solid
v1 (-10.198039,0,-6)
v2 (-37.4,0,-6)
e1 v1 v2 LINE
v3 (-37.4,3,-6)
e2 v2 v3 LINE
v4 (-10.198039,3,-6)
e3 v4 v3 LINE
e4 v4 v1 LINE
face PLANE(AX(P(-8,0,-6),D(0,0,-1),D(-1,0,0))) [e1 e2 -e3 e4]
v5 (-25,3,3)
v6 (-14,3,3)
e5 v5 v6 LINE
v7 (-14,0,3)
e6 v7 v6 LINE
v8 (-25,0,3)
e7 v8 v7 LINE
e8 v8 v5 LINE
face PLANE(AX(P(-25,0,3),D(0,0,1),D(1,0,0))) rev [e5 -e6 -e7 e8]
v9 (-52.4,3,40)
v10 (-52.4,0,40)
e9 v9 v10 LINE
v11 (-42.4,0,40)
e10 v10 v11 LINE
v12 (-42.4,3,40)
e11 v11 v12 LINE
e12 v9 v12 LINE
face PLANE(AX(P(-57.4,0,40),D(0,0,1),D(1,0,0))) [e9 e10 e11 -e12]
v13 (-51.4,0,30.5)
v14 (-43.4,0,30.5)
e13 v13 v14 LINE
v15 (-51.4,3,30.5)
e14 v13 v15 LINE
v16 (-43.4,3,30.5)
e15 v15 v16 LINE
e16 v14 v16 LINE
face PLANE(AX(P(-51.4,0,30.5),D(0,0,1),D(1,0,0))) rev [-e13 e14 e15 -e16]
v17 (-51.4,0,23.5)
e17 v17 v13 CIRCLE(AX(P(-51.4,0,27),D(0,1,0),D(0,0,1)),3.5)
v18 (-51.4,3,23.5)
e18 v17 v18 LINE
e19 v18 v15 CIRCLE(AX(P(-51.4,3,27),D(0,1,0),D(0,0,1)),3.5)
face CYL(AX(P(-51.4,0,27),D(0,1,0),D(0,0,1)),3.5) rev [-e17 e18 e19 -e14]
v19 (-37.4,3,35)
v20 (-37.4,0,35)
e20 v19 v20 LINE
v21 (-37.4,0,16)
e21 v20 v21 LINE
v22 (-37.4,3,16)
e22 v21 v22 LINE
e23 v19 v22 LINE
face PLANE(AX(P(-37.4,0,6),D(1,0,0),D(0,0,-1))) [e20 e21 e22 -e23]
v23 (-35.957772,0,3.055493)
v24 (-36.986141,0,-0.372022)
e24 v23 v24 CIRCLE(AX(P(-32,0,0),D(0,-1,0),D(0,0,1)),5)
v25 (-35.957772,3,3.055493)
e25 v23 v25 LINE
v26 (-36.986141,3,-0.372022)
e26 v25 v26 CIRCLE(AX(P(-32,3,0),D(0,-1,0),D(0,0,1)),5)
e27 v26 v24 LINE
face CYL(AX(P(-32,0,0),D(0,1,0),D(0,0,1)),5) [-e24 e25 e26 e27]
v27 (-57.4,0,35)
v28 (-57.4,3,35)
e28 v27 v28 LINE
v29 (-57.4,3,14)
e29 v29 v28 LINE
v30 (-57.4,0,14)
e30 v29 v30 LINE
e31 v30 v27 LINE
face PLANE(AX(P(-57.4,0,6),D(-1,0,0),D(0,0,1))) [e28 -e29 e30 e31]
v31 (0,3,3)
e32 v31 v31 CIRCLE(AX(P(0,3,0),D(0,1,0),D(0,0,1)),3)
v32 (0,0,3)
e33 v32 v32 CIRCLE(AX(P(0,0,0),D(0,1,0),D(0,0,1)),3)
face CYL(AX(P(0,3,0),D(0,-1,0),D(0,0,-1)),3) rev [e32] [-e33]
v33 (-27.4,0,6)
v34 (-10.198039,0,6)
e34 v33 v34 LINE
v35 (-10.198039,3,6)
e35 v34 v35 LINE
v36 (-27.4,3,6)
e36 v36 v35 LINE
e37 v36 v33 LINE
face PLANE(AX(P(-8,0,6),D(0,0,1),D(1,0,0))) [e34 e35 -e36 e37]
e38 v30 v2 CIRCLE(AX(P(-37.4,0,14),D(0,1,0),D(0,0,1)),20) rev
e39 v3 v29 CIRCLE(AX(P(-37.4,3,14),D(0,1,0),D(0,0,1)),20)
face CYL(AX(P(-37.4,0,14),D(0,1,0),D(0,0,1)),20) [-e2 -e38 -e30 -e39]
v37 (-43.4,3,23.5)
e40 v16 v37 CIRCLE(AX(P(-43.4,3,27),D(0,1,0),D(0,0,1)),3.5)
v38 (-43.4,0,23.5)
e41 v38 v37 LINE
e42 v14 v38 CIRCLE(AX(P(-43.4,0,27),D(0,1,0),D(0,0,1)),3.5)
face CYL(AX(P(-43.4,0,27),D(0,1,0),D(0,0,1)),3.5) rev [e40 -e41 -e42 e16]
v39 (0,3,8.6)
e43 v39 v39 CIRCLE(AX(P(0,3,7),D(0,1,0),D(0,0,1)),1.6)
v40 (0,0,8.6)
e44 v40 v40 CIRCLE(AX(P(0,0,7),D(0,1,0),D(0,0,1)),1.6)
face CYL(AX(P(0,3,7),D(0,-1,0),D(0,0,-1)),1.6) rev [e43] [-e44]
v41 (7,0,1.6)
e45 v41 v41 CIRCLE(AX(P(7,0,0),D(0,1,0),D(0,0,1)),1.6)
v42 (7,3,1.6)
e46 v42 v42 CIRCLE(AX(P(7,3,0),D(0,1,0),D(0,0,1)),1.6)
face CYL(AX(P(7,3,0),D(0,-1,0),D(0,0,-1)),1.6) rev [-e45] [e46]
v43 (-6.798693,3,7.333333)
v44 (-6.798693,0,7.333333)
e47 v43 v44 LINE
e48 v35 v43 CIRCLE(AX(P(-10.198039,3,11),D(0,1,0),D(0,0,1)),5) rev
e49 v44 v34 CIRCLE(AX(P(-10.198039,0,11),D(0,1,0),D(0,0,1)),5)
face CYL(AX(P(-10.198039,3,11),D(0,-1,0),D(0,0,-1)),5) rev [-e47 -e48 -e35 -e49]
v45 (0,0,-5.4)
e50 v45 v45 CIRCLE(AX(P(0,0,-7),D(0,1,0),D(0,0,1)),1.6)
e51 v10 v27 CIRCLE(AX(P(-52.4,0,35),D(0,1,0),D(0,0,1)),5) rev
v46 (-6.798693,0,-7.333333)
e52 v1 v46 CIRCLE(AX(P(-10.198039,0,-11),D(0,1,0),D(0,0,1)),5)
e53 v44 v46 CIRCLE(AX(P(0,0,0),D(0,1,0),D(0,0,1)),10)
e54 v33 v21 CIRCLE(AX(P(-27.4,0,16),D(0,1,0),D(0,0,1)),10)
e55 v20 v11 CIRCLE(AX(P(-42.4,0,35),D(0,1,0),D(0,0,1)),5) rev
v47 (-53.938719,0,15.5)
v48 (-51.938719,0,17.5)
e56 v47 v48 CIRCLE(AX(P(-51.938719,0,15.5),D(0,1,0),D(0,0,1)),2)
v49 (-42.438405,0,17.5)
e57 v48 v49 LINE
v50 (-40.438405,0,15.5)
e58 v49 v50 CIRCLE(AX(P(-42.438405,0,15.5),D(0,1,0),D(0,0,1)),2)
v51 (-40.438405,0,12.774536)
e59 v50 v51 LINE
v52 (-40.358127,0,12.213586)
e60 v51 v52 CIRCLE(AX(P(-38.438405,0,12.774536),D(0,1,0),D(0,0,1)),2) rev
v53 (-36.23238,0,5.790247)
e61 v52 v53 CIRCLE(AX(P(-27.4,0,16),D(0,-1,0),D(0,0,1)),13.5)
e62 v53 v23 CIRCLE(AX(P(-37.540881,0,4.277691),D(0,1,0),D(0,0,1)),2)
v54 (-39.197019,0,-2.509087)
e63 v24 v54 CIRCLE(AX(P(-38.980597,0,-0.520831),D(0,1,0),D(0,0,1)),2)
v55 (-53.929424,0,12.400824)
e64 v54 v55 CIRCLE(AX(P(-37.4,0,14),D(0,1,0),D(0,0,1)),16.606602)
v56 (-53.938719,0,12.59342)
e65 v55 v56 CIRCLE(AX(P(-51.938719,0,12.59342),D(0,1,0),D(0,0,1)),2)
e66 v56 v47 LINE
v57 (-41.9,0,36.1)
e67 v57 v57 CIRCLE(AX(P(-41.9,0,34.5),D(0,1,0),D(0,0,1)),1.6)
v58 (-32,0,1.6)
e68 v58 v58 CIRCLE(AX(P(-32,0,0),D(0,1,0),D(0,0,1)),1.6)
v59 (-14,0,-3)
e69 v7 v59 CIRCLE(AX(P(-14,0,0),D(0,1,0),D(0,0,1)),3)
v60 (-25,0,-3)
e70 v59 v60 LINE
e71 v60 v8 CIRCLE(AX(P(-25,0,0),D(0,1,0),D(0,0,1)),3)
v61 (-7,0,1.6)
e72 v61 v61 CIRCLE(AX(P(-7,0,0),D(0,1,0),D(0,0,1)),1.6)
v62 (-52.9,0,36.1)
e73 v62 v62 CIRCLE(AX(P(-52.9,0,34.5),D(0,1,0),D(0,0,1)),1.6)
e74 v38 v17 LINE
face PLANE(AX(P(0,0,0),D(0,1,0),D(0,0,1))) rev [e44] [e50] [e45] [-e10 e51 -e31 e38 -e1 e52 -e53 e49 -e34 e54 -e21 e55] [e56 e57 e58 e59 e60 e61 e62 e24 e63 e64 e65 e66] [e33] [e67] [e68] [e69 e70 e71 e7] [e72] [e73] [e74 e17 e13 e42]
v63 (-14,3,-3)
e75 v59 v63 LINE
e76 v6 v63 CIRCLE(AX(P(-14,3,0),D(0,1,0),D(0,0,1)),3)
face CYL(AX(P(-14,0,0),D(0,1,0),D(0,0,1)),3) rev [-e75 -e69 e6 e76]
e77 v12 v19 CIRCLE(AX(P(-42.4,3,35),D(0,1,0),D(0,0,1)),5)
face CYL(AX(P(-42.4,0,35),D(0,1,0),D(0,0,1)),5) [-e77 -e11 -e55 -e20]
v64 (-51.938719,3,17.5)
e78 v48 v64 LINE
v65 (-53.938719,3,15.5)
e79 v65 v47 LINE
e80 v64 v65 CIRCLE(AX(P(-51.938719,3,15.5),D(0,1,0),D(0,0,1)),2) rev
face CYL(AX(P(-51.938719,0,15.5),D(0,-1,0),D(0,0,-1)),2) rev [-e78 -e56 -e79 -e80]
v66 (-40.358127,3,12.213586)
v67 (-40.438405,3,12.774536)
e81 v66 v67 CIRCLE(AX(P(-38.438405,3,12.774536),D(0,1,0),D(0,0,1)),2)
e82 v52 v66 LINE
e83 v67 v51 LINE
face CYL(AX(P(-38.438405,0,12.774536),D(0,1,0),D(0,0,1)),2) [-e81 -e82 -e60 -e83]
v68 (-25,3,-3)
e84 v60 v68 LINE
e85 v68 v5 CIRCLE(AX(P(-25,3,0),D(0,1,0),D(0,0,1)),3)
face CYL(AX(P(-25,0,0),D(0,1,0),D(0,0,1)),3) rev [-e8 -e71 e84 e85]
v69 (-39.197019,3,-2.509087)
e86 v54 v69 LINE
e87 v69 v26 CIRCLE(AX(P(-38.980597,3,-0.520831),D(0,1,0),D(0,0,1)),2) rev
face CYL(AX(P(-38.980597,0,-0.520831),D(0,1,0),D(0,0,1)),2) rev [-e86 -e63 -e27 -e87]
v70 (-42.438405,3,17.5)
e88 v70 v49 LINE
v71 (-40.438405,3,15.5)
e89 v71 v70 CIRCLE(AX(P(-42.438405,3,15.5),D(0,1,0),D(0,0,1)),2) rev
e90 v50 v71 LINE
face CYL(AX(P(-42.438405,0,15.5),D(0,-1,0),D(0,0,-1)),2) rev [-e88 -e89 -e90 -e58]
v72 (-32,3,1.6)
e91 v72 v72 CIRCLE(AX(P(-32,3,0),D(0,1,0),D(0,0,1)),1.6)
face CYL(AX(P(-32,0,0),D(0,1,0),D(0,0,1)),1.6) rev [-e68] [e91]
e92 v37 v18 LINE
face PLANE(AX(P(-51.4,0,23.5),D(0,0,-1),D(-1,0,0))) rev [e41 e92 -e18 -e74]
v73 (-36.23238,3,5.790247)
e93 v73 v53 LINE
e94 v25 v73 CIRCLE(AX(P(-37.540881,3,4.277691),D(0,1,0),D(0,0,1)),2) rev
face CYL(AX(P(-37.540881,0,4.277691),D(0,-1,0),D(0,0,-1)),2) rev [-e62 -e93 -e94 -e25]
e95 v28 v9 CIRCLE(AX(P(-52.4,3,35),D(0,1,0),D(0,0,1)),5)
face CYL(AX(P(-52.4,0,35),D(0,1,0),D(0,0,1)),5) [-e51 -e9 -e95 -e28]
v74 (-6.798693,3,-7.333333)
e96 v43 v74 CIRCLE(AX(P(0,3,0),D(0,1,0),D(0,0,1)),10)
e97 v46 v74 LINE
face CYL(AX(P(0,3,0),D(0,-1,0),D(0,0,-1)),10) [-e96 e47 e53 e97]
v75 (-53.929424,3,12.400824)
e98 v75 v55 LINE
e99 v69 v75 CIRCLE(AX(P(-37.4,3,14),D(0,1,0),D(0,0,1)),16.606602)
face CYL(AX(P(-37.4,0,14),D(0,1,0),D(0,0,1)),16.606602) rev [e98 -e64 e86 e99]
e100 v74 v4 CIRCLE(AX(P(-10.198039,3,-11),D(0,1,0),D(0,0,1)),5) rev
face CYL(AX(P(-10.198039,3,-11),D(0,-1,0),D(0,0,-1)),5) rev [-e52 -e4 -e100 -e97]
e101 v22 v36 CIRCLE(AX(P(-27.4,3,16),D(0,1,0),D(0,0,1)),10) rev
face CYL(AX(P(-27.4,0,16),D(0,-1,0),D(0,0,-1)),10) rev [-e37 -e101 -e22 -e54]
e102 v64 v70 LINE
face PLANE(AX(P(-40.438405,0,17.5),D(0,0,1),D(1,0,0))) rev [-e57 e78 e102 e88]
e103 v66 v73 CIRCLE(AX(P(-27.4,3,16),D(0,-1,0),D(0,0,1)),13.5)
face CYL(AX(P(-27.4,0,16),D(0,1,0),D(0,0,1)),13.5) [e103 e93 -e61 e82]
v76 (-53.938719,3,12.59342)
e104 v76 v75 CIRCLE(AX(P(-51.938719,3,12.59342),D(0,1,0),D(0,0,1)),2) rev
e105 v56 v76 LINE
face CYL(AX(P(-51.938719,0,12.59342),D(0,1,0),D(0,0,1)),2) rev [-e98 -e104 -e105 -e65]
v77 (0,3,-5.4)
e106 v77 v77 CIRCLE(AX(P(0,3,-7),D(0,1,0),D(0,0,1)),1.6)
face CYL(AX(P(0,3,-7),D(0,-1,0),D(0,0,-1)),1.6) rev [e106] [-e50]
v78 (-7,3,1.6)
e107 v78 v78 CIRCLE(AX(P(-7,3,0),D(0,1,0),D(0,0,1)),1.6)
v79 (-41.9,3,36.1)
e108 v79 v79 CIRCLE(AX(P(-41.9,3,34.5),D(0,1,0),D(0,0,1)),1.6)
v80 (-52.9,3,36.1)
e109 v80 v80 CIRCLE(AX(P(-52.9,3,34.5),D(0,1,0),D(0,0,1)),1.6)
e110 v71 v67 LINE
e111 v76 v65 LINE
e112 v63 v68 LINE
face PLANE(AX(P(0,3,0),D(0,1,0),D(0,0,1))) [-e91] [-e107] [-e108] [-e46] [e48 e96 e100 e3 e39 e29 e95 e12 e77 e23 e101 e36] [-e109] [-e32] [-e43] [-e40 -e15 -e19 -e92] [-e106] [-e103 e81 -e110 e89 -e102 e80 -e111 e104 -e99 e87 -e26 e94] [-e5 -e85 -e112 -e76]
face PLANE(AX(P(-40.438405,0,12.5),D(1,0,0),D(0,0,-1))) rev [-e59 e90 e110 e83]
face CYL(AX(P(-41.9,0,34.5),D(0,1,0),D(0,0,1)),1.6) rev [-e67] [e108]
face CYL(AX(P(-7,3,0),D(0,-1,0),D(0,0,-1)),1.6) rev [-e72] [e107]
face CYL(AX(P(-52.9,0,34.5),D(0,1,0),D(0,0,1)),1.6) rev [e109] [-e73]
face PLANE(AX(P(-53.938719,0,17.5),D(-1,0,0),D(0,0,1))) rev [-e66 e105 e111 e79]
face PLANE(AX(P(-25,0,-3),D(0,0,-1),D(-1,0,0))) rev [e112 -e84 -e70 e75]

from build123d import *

# Parameters (mm, degrees)
SKETCH_1_R          = 10
SKETCH_1_R_2        = 3
SKETCH_1_R_3        = 1.6
SKETCH_1_R_4        = 1.600000000000001
SKETCH_1_R_5        = 1.6000000000000003
SKETCH_1_R_6        = 1.6000000000000019
EXTRUDE_1_DEPTH     = 3
EXTRUDE_2_DEPTH     = 3
SKETCH_3_R          = 1.5999999999999974
EXTRUDE_3_DEPTH     = 3
FILLET_1_R          = 10
FILLET_2_R          = 20
CUT_EXTRUDE_START   = -3
SKETCH_4_R          = 1.6000000000000019
SKETCH_4_R_2        = 1.599999999999998
CUT_EXTRUDE_1_DEPTH = 3
FILLET_3_R          = 5
FILLET_4_R          = 2


with BuildPart() as part:
    # 草图1 → 凸台-拉伸1 (new body)
    with BuildSketch(Plane(origin=(0, 0, 0), x_dir=(1, 0, 0), z_dir=(0, 1, 0))):
        with Locations(Location((0, 0, 0), (0, 0, 270))):
            Circle(SKETCH_1_R)
        with Locations(Location((0, 0, 0), (0, 0, 270))):
            Circle(SKETCH_1_R_2, mode=Mode.SUBTRACT)
        with Locations(Location((0, 6.999999999999999, 0), (0, 0, 270))):
            Circle(SKETCH_1_R_3, mode=Mode.SUBTRACT)
        with Locations(Location((6.999999999999998, 0, 0), (0, 0, 270))):
            Circle(SKETCH_1_R_4, mode=Mode.SUBTRACT)
        with Locations(Location((8.7e-16, -6.999999999999999, 0), (0, 0, 270))):
            Circle(SKETCH_1_R_5, mode=Mode.SUBTRACT)
        with Locations(Location((-6.999999999999999, -8.7e-16, 0), (0, 0, 270))):
            Circle(SKETCH_1_R_6, mode=Mode.SUBTRACT)
    extrude(amount=EXTRUDE_1_DEPTH)

    # 草图2 → 凸台-拉伸2 (add)
    with BuildSketch(Plane(origin=(0, 3, 0), x_dir=(1, 0, 0), z_dir=(0, 1, 0))):
        Polygon((-8.000000000000005, -5.999999999999994), (-57.4, -6), (-57.4, 6), (-8.000000000000005, 5.999999999999994), align=None)
    extrude(amount=-EXTRUDE_2_DEPTH)

    # 草图3 → 凸台-拉伸3 (add)
    with BuildSketch(Plane(origin=(0, 3, 0), x_dir=(1, 0, 0), z_dir=(0, 1, 0))):
        Polygon((-57.4, -6), (-37.399999999999984, -6), (-37.39999999999999, -40), (-57.39999999999999, -40), align=None)
        with Locations(Location((-52.89999999999999, -34.5, 0), (0, 0, 270))):
            Circle(SKETCH_3_R, mode=Mode.SUBTRACT)
        with Locations(Location((-41.89999999999999, -34.5, 0), (0, 0, 270))):
            Circle(SKETCH_3_R, mode=Mode.SUBTRACT)
    extrude(amount=-EXTRUDE_3_DEPTH)

    # 圆角1
    fillet_1_edges = [part.edges().sort_by_distance(p)[0] for p in [
        (-37.399999999999984, 1.5, 6),
    ]]
    fillet(fillet_1_edges, radius=FILLET_1_R)

    # 圆角2
    fillet_2_edges = [part.edges().sort_by_distance(p)[0] for p in [
        (-57.4, 1.5, -6),
    ]]
    fillet(fillet_2_edges, radius=FILLET_2_R)

    # 草图4 → 切除-拉伸1 (cut)
    with BuildSketch(Plane(origin=(0, 3, 0), x_dir=(1, 0, 0), z_dir=(0, 1, 0)).offset(CUT_EXTRUDE_START)):
        with Locations(Location((-6.999999999999999, -8.7e-16, 0), (0, 0, 270))):
            Circle(SKETCH_4_R)
        with Locations(Location((-32, 0, 0), (0, 0, 270))):
            Circle(SKETCH_4_R_2)
        with BuildLine():
            Line((-24.999999999999996, 3), (-13.999999999999998, 3))
            ThreePointArc((-13.999999999999998, 3), (-10.999999999999998, 0), (-13.999999999999998, -3))
            Line((-13.999999999999998, -3), (-24.999999999999996, -3))
            ThreePointArc((-24.999999999999996, -3), (-27.999999999999996, 3.7e-16), (-24.999999999999996, 3))
        make_face()
        with BuildLine():
            Line((-51.399999999999984, -23.500000000000004), (-43.39999999999999, -23.500000000000004))
            ThreePointArc((-43.39999999999999, -23.500000000000004), (-39.89999999999999, -27.000000000000004), (-43.39999999999999, -30.500000000000004))
            Line((-43.39999999999999, -30.500000000000004), (-51.399999999999984, -30.500000000000004))
            ThreePointArc((-51.399999999999984, -30.500000000000004), (-54.899999999999984, -27.000000000000004), (-51.399999999999984, -23.500000000000004))
        make_face()
        with BuildLine():
            Line((-40.43840481040531, -12.5), (-40.43840481040531, -17.500000000000004))
            Line((-40.43840481040531, -17.500000000000004), (-53.93871883229112, -17.500000000000007))
            Line((-53.93871883229112, -17.500000000000007), (-53.938718832291116, -12.5))
            ThreePointArc((-53.938718832291116, -12.5), (-48.18321723568186, -1.3706117859306186), (-36.28930043689978, 2.5694166190035115))
            ThreePointArc((-36.28930043689978, 2.5694166190035115), (-36.81589304125609, -1.3443117998370948), (-34.338414417674585, -4.419481645081424))
            ThreePointArc((-34.338414417674585, -4.419481645081424), (-38.17460072758567, -7.866244461436596), (-40.43840481040531, -12.5))
        make_face()
    extrude(amount=CUT_EXTRUDE_1_DEPTH, mode=Mode.SUBTRACT)

    # 圆角3
    fillet_3_edges = [part.edges().sort_by_distance(p)[0] for p in [
        (-8.000000000000005, 1.5, -5.999999999999994),
        (-8.000000000000005, 1.5, 5.999999999999994),
        (-57.39999999999999, 1.5, 40),
        (-37.39999999999999, 1.5, 40),
    ]]
    fillet(fillet_3_edges, radius=FILLET_3_R)

    # 圆角4
    # the kernel refuses this fillet: 2 mm, written as the material it adds along each edge
    with BuildSketch(Plane(origin=(-36.28930043689978, 0, -2.5694166190035155), x_dir=(-0.9997848253310014, 0, 0.020743746958035388), z_dir=(0, 1, 0))) as fillet_4_piece_1:
        with BuildLine():
            CenterArc((2.7332128689398965, 1.9923174543114084), FILLET_4_R, 174.54438439769004, 100.47920721380297)
            ThreePointArc((0.7422725749788821, 2.1824667269433027), (0.49863093433961686, 1.0478715203584514), (0, 0))
            ThreePointArc((0, 0), (1.4541723542762737, -0.06379048821461454), (2.9083447085525433, 0))
        make_face()
    extrude(amount=3)
    with BuildSketch(Plane(origin=(-34.338414417674585, 0, 4.419481645081424), x_dir=(-0.7648370504250814, 0, -0.6442237858827173), z_dir=(0, 1, 0))) as fillet_4_piece_2:
        with BuildLine():
            CenterArc((2.5407101067548044, 1.9546581979795647), FILLET_4_R, 170.9703370053984, 86.80615278737906)
            ThreePointArc((0.5654956678276036, 2.2685497720198655), (0.33194950705873716, 1.1220100755321154), (0, 0))
            ThreePointArc((0, 0), (1.0586292111478346, 0.11335450505108799), (2.117258422295671, -7e-17))
        make_face()
    extrude(amount=3)
    with BuildSketch(Plane(origin=(-40.43840481040531, 0, 17.500000000000004), x_dir=(0, 0, -1), z_dir=(0, 1, 0))) as fillet_4_piece_3:
        with BuildLine():
            CenterArc((FILLET_4_R, FILLET_4_R), FILLET_4_R, 180, 90)
            Line((0, FILLET_4_R), (0, 0))
            Line((0, 0), (FILLET_4_R, 0))
        make_face()
    extrude(amount=3)
    with BuildSketch(Plane(origin=(-53.93871883229112, 0, 17.500000000000007), x_dir=(1, 0, 0), z_dir=(0, 1, 0))) as fillet_4_piece_4:
        with BuildLine():
            CenterArc((FILLET_4_R, FILLET_4_R), FILLET_4_R, 179.99999999999986, 90.00000000000011)
            Line((7.11e-15, FILLET_4_R), (0, 0))
            Line((0, 0), (FILLET_4_R, 0))
        make_face()
    extrude(amount=3)
    with BuildSketch(Plane(origin=(-53.938718832291116, 0, 12.5), x_dir=(0.09331197212510238, 0, -0.9956369196941844), z_dir=(0, 1, 0))) as fillet_4_piece_5:
        with BuildLine():
            CenterArc((0.09361195431707342, -1.9999910052952001), FILLET_4_R, 89.8281631699166, 5.526008171417317)
            Line((-0.09301198993312956, -0.00871716590683111), (0, 0))
            ThreePointArc((0, 0), (0.04980509112364704, 7.468574010459e-05), (0.09961018224729987, 0))
        make_face()
    extrude(amount=3)
    # the kernel refuses this fillet: 2 mm, written as the material it takes off along each edge
    with BuildSketch(Plane(origin=(-40.43840481040531, -0.7436301227400532, 12.500000000000004), x_dir=(0.26988358130767626, 0, -0.9628929600638604), z_dir=(0, 1, 0))) as fillet_4_2_piece_1:
        with BuildLine():
            CenterArc((0.2754185639777855, -1.9998786277005756), FILLET_4_R, 89.36877437844454, 16.28856500222963)
            Line((-0.2643485986375687, -0.0740927075728552), (0, 0))
            ThreePointArc((0, 0), (0.14872602454800565, 0.00081926302110449), (0.29745204909602135, 1e-17))
        make_face()
    extrude(amount=4.4872602454801065, mode=Mode.SUBTRACT)


solid = part.part
